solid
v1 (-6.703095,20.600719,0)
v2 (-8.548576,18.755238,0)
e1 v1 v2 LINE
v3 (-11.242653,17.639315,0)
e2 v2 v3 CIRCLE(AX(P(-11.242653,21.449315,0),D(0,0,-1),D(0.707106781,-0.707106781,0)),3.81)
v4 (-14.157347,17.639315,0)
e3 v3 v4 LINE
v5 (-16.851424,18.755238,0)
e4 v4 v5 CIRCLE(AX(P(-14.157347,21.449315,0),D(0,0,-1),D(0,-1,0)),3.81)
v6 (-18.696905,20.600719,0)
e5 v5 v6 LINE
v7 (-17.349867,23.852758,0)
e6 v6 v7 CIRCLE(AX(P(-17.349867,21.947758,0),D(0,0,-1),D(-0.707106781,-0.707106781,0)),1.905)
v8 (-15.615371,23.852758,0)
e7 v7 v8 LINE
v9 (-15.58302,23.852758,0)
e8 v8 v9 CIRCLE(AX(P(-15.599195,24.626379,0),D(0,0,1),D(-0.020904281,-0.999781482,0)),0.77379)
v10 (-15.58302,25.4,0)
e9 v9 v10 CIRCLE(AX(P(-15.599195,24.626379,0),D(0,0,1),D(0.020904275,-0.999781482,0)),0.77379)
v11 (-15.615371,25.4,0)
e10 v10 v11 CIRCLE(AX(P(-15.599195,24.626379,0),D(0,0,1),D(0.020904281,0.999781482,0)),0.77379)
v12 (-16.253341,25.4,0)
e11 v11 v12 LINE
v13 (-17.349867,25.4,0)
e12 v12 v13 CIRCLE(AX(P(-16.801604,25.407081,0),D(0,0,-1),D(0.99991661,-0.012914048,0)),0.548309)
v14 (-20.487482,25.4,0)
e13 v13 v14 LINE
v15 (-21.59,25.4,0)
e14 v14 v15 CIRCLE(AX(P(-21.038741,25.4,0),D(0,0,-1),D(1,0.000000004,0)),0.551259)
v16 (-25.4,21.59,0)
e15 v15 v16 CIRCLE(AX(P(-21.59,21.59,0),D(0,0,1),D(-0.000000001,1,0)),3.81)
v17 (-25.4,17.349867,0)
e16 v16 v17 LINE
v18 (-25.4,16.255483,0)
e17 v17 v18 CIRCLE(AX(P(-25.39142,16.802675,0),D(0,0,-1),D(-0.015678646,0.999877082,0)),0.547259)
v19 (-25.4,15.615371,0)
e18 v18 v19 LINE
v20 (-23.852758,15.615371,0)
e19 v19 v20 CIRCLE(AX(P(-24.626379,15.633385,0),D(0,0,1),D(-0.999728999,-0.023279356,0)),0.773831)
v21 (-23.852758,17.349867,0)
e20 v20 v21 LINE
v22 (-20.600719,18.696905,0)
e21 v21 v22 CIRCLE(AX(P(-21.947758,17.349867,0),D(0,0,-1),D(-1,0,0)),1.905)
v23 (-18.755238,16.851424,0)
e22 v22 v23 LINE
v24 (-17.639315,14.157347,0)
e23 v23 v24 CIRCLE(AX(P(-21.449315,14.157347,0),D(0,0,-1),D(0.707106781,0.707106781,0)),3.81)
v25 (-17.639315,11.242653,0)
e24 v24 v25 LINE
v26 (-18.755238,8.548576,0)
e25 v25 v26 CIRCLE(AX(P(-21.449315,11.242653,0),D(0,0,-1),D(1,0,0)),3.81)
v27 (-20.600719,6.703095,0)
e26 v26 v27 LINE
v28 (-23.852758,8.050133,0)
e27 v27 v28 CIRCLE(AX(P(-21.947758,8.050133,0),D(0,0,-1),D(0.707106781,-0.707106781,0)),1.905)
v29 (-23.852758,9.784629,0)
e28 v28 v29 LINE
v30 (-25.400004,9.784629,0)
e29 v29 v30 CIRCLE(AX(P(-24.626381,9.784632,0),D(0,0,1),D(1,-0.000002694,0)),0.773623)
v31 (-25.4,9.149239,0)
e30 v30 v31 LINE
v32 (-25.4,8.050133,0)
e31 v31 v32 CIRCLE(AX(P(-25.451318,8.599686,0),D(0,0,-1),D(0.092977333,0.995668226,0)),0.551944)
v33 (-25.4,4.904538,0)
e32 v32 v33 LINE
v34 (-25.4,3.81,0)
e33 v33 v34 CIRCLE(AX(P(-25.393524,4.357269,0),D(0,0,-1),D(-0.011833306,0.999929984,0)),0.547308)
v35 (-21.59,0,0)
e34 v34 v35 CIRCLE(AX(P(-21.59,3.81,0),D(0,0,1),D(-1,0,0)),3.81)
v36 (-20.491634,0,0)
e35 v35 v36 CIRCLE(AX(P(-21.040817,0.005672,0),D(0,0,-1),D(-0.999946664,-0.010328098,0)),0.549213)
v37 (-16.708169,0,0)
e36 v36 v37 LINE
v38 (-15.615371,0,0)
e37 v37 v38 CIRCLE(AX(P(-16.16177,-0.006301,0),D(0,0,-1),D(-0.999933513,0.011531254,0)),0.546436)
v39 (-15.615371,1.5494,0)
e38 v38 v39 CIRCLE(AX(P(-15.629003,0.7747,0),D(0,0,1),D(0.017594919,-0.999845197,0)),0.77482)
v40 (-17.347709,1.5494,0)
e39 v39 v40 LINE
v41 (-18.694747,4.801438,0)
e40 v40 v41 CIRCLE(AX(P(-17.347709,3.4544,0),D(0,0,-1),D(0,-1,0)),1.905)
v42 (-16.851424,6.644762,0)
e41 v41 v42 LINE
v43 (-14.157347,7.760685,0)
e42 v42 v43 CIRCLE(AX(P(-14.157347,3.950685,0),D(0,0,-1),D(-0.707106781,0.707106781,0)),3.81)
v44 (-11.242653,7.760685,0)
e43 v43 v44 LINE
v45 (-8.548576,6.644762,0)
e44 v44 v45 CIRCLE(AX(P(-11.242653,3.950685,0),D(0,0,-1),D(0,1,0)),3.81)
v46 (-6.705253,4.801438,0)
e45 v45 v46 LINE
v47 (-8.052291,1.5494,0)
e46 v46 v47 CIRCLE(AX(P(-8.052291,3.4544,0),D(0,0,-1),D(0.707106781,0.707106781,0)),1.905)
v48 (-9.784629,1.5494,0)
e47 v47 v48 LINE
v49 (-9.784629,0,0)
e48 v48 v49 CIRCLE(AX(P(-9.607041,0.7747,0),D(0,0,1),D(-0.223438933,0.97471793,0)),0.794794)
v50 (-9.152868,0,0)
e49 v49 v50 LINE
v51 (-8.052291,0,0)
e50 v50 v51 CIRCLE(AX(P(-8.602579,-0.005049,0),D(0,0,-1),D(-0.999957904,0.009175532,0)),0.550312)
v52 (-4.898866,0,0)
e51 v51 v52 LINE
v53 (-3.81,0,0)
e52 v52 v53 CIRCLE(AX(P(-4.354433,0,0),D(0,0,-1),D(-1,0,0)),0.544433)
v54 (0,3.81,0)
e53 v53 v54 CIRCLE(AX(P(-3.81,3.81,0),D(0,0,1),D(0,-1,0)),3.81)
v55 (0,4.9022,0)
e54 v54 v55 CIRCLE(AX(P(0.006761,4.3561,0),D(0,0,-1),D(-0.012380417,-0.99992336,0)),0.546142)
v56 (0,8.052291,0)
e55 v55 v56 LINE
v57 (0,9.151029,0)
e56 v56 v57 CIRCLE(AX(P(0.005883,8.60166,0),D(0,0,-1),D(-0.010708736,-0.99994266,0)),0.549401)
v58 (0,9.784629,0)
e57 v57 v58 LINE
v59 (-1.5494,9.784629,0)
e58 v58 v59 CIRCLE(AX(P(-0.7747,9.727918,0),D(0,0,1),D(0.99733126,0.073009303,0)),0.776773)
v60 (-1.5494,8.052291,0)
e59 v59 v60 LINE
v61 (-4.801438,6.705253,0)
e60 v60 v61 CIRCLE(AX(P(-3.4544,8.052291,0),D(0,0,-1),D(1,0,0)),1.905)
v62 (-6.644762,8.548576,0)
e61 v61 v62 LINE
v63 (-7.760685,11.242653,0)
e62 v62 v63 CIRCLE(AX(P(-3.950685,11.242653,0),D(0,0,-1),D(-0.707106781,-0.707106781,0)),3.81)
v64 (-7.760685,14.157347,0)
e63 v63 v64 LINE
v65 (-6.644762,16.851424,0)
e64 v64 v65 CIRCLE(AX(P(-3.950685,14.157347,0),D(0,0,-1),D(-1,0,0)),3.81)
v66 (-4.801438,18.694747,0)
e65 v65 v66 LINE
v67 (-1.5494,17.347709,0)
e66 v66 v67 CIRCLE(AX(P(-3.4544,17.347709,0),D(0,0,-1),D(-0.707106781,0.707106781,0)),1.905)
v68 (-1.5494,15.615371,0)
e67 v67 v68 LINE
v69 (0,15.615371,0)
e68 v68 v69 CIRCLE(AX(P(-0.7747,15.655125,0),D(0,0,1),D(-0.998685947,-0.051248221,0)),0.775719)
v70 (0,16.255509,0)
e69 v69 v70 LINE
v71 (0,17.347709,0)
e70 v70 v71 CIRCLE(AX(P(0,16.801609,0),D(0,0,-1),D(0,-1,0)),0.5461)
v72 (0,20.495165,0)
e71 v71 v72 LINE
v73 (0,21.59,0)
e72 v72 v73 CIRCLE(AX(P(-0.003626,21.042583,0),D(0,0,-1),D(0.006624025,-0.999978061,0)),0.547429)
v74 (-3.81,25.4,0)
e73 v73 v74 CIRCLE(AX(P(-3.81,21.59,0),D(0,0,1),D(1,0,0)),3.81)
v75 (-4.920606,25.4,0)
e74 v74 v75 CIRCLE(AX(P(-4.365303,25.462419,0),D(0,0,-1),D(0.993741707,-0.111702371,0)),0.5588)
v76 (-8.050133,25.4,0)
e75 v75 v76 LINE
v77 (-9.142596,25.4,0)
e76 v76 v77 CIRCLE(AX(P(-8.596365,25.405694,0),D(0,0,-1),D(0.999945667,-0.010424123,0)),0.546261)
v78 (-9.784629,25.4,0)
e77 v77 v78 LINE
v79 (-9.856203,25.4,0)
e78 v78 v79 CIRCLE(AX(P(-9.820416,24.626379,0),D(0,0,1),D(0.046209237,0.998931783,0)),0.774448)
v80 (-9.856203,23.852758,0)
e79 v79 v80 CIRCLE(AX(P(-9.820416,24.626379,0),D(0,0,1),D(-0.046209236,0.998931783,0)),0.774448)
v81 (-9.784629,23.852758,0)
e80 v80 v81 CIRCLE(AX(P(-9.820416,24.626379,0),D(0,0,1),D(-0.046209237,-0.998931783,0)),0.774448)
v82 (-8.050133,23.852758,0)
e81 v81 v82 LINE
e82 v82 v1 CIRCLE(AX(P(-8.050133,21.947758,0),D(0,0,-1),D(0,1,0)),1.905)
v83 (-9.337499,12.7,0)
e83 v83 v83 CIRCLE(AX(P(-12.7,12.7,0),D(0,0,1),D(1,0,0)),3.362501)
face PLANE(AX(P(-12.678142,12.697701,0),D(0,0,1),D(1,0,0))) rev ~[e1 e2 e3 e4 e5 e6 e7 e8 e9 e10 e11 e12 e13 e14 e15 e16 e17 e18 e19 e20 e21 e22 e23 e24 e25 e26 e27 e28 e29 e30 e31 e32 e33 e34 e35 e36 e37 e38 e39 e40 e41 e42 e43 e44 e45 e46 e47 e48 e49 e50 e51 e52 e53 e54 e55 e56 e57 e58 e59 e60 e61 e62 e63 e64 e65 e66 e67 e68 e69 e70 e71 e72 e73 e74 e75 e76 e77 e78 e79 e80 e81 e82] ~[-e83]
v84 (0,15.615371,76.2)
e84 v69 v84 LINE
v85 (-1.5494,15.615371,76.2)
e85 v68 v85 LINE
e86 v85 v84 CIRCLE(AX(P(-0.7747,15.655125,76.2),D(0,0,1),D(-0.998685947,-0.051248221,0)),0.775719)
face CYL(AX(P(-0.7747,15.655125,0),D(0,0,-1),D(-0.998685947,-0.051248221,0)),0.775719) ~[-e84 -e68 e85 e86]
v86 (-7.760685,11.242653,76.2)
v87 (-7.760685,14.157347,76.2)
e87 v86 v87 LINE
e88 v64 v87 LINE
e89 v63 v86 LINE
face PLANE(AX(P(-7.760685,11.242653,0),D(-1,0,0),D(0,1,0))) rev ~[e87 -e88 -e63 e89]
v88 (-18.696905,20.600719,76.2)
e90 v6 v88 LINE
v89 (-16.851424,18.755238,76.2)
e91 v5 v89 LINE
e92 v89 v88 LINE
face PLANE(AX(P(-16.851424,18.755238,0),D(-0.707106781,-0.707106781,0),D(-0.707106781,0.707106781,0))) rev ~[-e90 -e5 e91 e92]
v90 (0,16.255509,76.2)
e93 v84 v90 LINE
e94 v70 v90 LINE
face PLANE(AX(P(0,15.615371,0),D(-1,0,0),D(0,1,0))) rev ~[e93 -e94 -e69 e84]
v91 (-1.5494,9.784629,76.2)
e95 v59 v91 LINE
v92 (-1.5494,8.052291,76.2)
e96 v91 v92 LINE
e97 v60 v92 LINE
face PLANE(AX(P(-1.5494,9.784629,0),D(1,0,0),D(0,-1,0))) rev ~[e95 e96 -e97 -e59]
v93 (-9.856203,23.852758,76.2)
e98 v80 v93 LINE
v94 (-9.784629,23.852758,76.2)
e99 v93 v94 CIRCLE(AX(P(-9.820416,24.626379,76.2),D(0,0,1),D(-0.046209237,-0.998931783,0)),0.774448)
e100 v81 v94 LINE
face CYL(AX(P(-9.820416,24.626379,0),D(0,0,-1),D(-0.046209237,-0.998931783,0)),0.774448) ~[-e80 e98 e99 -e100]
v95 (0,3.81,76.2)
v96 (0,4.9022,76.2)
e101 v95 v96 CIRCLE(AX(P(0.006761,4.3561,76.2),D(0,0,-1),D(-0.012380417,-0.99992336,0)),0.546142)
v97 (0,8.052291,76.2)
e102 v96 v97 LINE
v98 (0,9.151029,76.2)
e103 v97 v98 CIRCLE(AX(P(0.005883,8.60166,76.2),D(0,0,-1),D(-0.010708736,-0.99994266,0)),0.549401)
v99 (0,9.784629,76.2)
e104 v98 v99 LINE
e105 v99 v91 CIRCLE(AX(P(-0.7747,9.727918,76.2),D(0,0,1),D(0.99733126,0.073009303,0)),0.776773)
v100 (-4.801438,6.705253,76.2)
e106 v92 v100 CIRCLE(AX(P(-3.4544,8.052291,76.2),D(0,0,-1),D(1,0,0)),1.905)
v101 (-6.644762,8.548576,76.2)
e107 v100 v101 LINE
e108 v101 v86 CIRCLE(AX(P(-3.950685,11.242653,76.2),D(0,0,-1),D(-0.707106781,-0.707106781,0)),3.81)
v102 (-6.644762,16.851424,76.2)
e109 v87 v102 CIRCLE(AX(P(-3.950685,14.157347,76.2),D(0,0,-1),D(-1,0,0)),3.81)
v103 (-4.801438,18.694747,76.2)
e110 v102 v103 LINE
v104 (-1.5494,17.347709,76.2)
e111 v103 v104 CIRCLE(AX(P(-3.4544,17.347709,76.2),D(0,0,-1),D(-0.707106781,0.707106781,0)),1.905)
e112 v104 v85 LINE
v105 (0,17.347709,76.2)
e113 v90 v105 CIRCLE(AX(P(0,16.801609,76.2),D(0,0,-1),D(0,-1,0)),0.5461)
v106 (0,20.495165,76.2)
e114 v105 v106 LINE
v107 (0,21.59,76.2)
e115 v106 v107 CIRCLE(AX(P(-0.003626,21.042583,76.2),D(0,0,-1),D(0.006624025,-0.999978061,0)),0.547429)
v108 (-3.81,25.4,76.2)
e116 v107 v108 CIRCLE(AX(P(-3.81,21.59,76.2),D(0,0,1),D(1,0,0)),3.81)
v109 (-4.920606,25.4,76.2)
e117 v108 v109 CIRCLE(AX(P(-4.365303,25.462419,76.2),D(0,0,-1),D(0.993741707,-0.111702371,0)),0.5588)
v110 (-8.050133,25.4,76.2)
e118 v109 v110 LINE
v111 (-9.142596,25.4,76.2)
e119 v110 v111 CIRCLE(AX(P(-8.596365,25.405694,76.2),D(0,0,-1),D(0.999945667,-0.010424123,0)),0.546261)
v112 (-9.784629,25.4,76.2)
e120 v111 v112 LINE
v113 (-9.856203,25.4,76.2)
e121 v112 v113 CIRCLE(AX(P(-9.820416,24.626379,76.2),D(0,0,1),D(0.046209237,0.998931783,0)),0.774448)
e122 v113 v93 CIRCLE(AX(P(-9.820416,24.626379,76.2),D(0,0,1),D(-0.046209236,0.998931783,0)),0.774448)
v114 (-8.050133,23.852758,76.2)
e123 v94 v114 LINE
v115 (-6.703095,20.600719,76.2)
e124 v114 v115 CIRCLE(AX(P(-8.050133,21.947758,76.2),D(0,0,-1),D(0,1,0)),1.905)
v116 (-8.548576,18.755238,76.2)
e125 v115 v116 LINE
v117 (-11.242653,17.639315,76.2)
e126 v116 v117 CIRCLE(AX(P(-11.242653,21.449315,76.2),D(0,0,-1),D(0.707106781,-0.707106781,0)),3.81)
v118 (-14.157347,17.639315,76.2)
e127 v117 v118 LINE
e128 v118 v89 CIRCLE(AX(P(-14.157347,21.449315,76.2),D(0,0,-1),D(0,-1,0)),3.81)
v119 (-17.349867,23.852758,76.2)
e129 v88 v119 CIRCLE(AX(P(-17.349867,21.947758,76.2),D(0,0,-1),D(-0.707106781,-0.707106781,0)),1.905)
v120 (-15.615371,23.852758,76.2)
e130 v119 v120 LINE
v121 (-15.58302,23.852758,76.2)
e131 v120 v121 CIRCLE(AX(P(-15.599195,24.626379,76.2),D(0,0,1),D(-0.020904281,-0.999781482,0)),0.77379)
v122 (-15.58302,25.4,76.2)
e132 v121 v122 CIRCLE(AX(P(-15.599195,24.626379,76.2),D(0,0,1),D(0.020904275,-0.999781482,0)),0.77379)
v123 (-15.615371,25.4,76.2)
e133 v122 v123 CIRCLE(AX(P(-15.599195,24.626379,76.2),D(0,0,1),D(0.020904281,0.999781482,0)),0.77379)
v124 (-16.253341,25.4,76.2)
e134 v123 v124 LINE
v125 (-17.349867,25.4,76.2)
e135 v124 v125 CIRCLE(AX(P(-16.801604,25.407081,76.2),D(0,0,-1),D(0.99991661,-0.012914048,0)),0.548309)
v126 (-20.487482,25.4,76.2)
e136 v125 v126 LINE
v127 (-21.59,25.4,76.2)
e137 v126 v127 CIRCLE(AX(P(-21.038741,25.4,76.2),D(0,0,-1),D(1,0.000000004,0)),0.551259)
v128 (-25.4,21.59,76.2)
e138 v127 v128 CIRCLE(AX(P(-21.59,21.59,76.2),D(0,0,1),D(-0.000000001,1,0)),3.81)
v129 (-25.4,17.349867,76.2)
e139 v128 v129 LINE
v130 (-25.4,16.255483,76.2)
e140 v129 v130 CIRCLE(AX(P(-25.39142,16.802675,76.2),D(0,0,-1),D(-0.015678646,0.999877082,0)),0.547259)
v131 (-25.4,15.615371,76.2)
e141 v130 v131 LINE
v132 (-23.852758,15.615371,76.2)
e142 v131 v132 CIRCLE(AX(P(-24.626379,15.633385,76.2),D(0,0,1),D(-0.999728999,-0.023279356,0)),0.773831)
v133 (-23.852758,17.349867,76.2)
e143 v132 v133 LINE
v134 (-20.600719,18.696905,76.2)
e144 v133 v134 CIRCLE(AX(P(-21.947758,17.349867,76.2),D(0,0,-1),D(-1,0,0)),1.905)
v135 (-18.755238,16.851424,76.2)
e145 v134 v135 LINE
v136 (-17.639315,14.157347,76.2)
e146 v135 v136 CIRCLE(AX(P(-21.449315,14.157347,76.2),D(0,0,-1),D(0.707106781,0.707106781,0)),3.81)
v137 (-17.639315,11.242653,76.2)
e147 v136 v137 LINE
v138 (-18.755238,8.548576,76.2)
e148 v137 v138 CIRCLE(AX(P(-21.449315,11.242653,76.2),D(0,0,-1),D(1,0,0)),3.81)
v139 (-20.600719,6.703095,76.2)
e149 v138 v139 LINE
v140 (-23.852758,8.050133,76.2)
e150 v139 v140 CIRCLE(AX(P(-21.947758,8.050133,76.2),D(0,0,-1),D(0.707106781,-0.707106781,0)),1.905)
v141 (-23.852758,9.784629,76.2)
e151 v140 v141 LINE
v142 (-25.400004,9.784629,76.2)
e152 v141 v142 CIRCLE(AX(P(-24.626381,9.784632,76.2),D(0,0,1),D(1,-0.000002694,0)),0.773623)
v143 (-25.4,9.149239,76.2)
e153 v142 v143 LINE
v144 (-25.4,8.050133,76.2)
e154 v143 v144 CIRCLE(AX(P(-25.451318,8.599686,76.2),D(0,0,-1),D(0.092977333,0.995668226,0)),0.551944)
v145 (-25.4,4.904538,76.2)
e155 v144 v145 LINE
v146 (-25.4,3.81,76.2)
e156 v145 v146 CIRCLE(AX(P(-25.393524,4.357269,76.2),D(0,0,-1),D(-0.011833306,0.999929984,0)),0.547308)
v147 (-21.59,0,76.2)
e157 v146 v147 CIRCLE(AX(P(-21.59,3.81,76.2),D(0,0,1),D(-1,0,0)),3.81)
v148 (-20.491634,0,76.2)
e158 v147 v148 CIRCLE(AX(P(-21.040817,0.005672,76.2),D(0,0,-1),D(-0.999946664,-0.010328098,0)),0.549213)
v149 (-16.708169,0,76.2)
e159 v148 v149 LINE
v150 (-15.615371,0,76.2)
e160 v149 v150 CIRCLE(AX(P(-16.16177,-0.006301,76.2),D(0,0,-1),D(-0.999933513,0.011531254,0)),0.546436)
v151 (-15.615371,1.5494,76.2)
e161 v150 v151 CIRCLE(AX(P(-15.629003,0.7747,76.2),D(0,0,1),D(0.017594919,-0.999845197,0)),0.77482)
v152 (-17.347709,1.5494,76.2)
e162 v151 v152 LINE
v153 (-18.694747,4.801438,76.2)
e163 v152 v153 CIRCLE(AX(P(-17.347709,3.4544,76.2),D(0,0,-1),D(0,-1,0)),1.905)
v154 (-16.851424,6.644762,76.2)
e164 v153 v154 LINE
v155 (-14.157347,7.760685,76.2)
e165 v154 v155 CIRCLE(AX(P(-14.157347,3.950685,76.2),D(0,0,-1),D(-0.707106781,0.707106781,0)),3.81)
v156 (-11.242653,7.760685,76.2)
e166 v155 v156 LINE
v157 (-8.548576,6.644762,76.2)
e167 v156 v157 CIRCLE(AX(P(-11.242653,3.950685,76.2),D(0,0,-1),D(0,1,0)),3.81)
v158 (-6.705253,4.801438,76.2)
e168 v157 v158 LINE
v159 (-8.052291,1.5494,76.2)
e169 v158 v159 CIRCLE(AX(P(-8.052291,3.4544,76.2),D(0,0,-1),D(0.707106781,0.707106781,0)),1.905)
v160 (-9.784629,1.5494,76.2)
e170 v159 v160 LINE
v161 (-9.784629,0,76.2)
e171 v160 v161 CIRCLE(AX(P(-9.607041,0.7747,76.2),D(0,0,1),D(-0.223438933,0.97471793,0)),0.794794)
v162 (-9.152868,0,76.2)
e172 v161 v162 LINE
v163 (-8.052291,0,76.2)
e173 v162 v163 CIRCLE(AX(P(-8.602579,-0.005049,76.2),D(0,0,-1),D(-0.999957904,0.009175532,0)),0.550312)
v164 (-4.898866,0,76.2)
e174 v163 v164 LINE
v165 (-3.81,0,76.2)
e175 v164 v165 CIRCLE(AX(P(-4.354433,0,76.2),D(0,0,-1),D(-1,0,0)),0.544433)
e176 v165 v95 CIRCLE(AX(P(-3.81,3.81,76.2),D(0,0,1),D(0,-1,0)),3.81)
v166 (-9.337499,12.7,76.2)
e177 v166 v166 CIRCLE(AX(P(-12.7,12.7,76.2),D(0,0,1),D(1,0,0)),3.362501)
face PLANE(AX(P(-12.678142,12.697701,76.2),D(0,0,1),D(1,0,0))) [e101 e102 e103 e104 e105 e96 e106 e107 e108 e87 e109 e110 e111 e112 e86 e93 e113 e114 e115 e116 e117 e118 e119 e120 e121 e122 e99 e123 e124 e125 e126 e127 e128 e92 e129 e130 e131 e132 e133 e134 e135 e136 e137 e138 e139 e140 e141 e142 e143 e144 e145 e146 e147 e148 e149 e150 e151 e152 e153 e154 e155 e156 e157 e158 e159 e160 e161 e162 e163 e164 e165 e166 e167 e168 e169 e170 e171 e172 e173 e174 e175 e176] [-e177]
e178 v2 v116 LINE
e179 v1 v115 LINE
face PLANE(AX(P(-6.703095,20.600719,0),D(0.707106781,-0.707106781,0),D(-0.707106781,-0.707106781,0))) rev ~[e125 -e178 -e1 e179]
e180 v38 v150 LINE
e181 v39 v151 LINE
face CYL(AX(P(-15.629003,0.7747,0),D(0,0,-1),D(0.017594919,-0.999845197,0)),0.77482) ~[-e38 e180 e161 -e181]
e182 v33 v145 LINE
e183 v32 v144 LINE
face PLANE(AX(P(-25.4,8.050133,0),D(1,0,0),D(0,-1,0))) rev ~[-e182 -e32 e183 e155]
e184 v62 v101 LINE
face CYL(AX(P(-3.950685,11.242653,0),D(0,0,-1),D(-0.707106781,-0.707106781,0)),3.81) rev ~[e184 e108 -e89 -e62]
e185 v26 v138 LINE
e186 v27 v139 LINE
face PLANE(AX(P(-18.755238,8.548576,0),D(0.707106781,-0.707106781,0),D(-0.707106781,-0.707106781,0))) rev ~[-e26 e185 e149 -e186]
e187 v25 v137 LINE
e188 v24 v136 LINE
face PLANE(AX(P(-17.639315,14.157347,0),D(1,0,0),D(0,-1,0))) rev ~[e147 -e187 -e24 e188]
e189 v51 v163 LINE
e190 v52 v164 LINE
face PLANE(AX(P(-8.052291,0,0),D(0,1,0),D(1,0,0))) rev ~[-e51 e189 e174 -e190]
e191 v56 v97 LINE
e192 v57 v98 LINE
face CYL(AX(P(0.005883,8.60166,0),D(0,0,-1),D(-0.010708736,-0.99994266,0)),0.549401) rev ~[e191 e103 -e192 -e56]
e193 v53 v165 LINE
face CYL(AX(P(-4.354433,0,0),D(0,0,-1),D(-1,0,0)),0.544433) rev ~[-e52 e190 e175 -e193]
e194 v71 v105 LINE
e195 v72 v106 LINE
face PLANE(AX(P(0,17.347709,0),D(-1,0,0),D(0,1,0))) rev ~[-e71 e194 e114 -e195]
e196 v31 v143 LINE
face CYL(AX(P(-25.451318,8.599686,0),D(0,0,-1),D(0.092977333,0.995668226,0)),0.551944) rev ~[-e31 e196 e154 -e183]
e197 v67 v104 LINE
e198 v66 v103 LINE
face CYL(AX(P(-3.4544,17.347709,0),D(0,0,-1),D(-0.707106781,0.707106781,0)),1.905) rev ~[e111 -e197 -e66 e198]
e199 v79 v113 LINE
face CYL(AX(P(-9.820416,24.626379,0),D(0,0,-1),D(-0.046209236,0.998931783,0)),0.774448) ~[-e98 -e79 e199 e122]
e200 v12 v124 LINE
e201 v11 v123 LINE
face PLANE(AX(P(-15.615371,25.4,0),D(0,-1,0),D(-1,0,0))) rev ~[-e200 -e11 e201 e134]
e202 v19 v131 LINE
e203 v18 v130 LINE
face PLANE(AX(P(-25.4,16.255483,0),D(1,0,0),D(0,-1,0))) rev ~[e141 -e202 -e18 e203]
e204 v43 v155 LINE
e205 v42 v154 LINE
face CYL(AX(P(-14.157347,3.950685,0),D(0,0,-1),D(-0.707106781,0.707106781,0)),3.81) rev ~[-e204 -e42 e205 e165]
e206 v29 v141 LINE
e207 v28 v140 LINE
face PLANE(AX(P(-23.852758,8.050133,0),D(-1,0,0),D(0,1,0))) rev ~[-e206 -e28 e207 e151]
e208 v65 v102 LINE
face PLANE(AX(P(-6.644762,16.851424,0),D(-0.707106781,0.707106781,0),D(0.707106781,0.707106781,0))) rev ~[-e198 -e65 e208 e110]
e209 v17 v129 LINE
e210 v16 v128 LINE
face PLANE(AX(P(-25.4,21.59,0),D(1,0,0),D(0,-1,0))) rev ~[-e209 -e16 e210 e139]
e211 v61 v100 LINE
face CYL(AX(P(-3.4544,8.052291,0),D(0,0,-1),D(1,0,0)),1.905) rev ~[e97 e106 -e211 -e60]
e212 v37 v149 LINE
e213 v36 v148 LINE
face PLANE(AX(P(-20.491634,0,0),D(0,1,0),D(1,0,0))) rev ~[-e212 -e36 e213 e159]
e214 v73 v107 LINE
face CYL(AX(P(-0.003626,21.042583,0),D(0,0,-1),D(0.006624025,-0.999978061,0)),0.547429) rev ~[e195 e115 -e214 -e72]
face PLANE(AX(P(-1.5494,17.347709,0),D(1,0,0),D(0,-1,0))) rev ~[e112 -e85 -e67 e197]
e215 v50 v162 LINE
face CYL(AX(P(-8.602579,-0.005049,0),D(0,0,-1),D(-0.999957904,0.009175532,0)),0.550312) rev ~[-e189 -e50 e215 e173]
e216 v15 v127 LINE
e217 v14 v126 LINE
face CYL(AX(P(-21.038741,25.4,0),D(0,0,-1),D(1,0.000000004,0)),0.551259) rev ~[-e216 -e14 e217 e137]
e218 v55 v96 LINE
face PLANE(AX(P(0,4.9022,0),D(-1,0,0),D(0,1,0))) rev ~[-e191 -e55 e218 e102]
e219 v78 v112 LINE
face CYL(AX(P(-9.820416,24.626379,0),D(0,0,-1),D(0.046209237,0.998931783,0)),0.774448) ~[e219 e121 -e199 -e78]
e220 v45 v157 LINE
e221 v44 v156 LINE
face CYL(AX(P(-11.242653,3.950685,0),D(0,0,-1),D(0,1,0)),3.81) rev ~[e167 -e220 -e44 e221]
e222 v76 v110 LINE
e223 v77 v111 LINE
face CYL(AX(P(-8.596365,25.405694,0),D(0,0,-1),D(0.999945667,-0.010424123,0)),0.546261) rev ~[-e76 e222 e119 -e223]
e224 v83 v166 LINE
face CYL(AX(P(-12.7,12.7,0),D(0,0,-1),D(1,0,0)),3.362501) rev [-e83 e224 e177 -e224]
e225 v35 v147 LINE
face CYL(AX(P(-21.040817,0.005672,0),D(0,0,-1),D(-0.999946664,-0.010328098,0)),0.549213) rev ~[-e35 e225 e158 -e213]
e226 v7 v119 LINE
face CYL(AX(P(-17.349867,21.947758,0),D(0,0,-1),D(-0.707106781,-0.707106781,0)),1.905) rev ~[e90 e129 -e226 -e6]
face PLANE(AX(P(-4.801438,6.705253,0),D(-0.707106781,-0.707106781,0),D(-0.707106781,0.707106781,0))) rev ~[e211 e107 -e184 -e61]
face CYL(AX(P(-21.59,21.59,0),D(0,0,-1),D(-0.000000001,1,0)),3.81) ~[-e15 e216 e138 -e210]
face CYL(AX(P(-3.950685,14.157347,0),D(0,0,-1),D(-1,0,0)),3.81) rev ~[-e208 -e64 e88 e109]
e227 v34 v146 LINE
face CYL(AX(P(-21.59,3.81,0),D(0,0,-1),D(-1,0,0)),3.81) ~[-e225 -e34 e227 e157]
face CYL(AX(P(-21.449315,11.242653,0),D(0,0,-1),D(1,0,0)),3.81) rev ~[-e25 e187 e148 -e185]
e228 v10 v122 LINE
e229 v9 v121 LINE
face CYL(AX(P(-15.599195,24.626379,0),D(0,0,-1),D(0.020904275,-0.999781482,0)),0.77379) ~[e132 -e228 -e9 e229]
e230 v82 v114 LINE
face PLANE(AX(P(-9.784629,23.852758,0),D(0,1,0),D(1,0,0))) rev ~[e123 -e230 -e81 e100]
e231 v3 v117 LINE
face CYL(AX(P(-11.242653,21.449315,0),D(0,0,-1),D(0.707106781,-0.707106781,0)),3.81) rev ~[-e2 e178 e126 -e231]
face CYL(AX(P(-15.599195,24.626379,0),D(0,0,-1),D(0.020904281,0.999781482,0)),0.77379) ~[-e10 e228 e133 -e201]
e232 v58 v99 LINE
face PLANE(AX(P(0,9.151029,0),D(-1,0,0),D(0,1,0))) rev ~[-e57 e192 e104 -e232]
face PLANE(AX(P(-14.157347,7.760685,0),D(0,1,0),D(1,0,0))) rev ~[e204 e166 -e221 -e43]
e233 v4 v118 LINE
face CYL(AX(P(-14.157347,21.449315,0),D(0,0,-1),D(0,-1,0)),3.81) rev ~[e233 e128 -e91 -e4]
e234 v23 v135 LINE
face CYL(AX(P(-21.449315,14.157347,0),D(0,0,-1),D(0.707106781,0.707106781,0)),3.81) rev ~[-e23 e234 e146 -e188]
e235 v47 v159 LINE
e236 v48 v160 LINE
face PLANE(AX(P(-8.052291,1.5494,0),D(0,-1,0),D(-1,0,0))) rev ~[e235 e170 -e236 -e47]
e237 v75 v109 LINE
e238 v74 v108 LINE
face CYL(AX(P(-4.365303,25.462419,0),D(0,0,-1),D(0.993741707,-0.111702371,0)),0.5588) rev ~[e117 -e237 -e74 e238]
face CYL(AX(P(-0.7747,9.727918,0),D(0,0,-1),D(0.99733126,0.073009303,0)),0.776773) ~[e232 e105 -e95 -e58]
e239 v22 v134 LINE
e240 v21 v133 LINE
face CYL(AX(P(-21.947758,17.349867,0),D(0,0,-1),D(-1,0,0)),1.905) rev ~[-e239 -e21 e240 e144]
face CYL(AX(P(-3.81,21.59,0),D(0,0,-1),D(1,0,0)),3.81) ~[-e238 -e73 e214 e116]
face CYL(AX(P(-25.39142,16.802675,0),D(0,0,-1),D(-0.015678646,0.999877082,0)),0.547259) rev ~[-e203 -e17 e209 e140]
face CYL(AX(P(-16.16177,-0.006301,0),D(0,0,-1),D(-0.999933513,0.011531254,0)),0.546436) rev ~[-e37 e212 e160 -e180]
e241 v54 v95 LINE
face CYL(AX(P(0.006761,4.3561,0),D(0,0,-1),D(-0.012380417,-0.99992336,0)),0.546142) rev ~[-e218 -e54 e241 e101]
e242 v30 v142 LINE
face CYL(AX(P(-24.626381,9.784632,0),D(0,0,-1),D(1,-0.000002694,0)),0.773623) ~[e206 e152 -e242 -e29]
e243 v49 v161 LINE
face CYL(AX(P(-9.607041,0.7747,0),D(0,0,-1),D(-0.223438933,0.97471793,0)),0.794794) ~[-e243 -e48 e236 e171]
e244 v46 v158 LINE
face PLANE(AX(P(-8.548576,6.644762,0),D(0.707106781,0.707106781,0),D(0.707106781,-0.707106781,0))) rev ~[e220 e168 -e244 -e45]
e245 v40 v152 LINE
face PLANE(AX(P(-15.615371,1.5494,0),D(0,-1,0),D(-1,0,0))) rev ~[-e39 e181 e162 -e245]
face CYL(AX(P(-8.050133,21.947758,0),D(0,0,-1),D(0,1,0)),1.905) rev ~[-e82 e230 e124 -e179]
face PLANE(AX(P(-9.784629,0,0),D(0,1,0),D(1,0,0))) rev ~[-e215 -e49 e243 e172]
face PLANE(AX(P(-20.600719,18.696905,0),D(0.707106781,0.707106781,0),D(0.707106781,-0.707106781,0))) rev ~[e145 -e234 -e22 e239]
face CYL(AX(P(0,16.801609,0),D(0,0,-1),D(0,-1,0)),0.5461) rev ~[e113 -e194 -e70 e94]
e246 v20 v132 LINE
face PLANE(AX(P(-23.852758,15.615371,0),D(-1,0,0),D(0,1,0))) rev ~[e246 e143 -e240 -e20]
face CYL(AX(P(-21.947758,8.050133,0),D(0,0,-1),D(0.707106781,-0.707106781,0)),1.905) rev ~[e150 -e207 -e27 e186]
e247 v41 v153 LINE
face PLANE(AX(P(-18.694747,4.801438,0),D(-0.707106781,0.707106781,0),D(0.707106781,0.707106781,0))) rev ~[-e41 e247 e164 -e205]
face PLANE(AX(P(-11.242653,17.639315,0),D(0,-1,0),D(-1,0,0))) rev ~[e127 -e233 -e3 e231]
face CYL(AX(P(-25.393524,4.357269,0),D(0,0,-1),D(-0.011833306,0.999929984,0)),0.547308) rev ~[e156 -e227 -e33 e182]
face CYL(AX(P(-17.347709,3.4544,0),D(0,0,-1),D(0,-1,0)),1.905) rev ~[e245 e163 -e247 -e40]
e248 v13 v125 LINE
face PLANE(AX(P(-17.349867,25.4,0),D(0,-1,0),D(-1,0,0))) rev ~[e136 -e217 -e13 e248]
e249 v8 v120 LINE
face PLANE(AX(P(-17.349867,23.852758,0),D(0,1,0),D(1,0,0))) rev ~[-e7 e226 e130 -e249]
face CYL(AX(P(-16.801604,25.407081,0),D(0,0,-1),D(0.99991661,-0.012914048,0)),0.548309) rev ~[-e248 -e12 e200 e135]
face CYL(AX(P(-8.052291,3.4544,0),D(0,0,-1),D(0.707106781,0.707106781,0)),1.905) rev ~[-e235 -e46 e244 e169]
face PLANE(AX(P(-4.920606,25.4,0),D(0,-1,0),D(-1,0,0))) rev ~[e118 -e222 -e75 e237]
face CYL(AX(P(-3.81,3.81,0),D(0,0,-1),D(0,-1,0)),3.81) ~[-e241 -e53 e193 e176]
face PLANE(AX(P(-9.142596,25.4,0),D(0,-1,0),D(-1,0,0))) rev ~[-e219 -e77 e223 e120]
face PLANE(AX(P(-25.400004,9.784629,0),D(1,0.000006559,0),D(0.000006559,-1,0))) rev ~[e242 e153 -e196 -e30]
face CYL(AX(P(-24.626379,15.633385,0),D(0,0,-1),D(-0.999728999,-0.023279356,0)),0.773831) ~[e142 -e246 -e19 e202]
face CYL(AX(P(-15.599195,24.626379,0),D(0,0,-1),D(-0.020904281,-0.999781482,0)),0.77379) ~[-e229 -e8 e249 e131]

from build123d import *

# Parameters (mm, degrees)
F0_R     = 3.3625011168
F1_DEPTH = 76.2


# Not quite as in the source:
# - ends of sketch curves that miss each other by under 0.0002 mm in the source are joined


with BuildPart() as f1:
    # F0 (on Top) → F1 (new body)
    with BuildSketch(Plane.XY):
        with BuildLine():
            ThreePointArc((-8.5485764575, 18.7552378401), (-9.7846294165, 17.9293336576), (-11.2426532939, 17.6393146764))
            Line((-11.2426532939, 17.6393146764), (-14.1573467061, 17.6393146764))
            ThreePointArc((-14.1573467061, 17.6393146764), (-15.6153705835, 17.9293336576), (-16.8514235425, 18.7552378401))
            Line((-16.8514235425, 18.7552378401), (-18.696905198, 20.6007194956))
            ThreePointArc((-18.696905198, 20.6007194956), (-19.1098572893, 22.6767698525), (-17.3498667798, 23.8527579138))
            Line((-17.3498667798, 23.8527579138), (-15.6153705835, 23.8527579138))
            Line((-15.6153705835, 23.8527579138), (-15.5830195394, 23.8527579138))
            ThreePointArc((-15.5830195394, 23.8527579138), (-14.8254049311, 24.6263789569), (-15.5830195394, 25.4))
            Line((-15.5830195394, 25.4), (-15.6153705835, 25.4))
            Line((-15.6153705835, 25.4), (-16.2533409894, 25.4))
            ThreePointArc((-16.2533409894, 25.4), (-16.8016038846, 24.8587722652), (-17.3498667798, 25.4))
            Line((-17.3498667798, 25.4), (-20.4874817282, 25.4))
            ThreePointArc((-20.4874817282, 25.4), (-21.0387408641, 24.8487408595), (-21.5900000046, 25.4))
            ThreePointArc((-21.5900000046, 25.4), (-24.2840768363, 24.2840768363), (-25.4, 21.59))
            Line((-25.4, 21.59), (-25.4, 20.5047242343))
            Line((-25.4, 20.5047242343), (-25.4, 17.3498667798))
            ThreePointArc((-25.4, 17.3498667798), (-24.8441605755, 16.8026749055), (-25.4, 16.2554830313))
            Line((-25.4, 16.2554830313), (-25.4, 15.6153705835))
            ThreePointArc((-25.4, 15.6153705835), (-24.6263789569, 14.8595541131), (-23.8527579138, 15.6153705835))
            Line((-23.8527579138, 15.6153705835), (-23.8527579138, 17.3498667798))
            ThreePointArc((-23.8527579138, 17.3498667798), (-22.6767698525, 19.1098572893), (-20.6007194956, 18.696905198))
            Line((-20.6007194956, 18.696905198), (-18.7552378401, 16.8514235425))
            ThreePointArc((-18.7552378401, 16.8514235425), (-17.9293336576, 15.6153705835), (-17.6393146764, 14.1573467061))
            Line((-17.6393146764, 14.1573467061), (-17.6393146764, 11.2426532939))
            ThreePointArc((-17.6393146764, 11.2426532939), (-17.9293336576, 9.7846294165), (-18.7552378401, 8.5485764575))
            Line((-18.7552378401, 8.5485764575), (-20.6007194956, 6.703094802))
            ThreePointArc((-20.6007194956, 6.703094802), (-22.6767698525, 6.2901427107), (-23.8527579138, 8.0501332202))
            Line((-23.8527579138, 8.0501332202), (-23.8527579138, 9.7846294165))
            ThreePointArc((-23.8527579138, 9.7846294165), (-24.6263789569, 10.5582546272), (-25.4000041675, 9.7846294165))
            Line((-25.4000041675, 9.7846294165), (-25.4, 9.1492393985))
            ThreePointArc((-25.4, 9.1492393985), (-24.8993742936, 8.5996863094), (-25.4, 8.0501332202))
            Line((-25.4, 8.0501332202), (-25.4, 4.904538393))
            ThreePointArc((-25.4, 4.904538393), (-24.8462160257, 4.3572691965), (-25.4, 3.81))
            ThreePointArc((-25.4, 3.81), (-24.2840768363, 1.1159231637), (-21.59, 0))
            ThreePointArc((-21.59, 0), (-21.0408167821, 0.5548848314), (-20.4916335642, 0))
            Line((-20.4916335642, 0), (-16.7081691325, 0))
            ThreePointArc((-16.7081691325, 0), (-16.161769858, 0.5401345174), (-15.6153705835, 0))
            ThreePointArc((-15.6153705835, 0), (-14.8541835334, 0.7747), (-15.6153705835, 1.5494))
            Line((-15.6153705835, 1.5494), (-17.347708866, 1.5494))
            ThreePointArc((-17.347708866, 1.5494), (-19.1076993754, 2.7253880613), (-18.6947472842, 4.8014384182))
            Line((-18.6947472842, 4.8014384182), (-16.8514235425, 6.6447621599))
            ThreePointArc((-16.8514235425, 6.6447621599), (-15.6153705835, 7.4706663424), (-14.1573467061, 7.7606853236))
            Line((-14.1573467061, 7.7606853236), (-11.2426532939, 7.7606853236))
            ThreePointArc((-11.2426532939, 7.7606853236), (-9.7846294165, 7.4706663424), (-8.5485764575, 6.6447621599))
            Line((-8.5485764575, 6.6447621599), (-6.7052527158, 4.8014384182))
            ThreePointArc((-6.7052527158, 4.8014384182), (-6.2923006246, 2.7253880613), (-8.052291134, 1.5494))
            Line((-8.052291134, 1.5494), (-9.7846294165, 1.5494))
            ThreePointArc((-9.7846294165, 1.5494), (-10.4018355229, 0.7747), (-9.7846294165, 0))
            Line((-9.7846294165, 0), (-9.1528678313, 0))
            ThreePointArc((-9.1528678313, 0), (-8.6025794826, 0.5452621138), (-8.052291134, 0))
            Line((-8.052291134, 0), (-4.8988661729, 0))
            ThreePointArc((-4.8988661729, 0), (-4.3544330864, 0.5444330864), (-3.81, 0))
            ThreePointArc((-3.81, 0), (-1.1159231637, 1.1159231637), (0, 3.81))
            ThreePointArc((0, 3.81), (-0.5393803924, 4.3561), (0, 4.9022))
            Line((0, 4.9022), (0, 8.052291134))
            ThreePointArc((0, 8.052291134), (-0.5435172497, 8.6016602673), (0, 9.1510294005))
            Line((0, 9.1510294005), (0, 9.7846294165))
            ThreePointArc((0, 9.7846294165), (-0.7747, 10.5046907664), (-1.5494, 9.7846294165))
            Line((-1.5494, 9.7846294165), (-1.5494, 8.052291134))
            ThreePointArc((-1.5494, 8.052291134), (-2.7253880613, 6.2923006246), (-4.8014384182, 6.7052527158))
            Line((-4.8014384182, 6.7052527158), (-6.6447621599, 8.5485764575))
            ThreePointArc((-6.6447621599, 8.5485764575), (-7.4706663424, 9.7846294165), (-7.7606853236, 11.2426532939))
            Line((-7.7606853236, 11.2426532939), (-7.7606853236, 14.1573467061))
            ThreePointArc((-7.7606853236, 14.1573467061), (-7.4706663424, 15.6153705835), (-6.6447621599, 16.8514235425))
            Line((-6.6447621599, 16.8514235425), (-4.8014384182, 18.6947472842))
            ThreePointArc((-4.8014384182, 18.6947472842), (-2.7253880613, 19.1076993754), (-1.5494, 17.347708866))
            Line((-1.5494, 17.347708866), (-1.5494, 15.6153705835))
            ThreePointArc((-1.5494, 15.6153705835), (-0.7747, 14.8794054827), (0, 15.6153705835))
            Line((0, 15.6153705835), (0, 16.255508866))
            ThreePointArc((0, 16.255508866), (-0.5461, 16.801608866), (0, 17.347708866))
            Line((0, 17.347708866), (0, 20.4951651394))
            ThreePointArc((0, 20.4951651394), (-0.5510556267, 21.0425825697), (0, 21.59))
            ThreePointArc((0, 21.59), (-1.1159231637, 24.2840768363), (-3.81, 25.4))
            ThreePointArc((-3.81, 25.4), (-4.3653028659, 24.9036192847), (-4.9206057318, 25.4))
            Line((-4.9206057318, 25.4), (-8.0501332202, 25.4))
            ThreePointArc((-8.0501332202, 25.4), (-8.5963647474, 24.8594330871), (-9.1425962746, 25.4))
            Line((-9.1425962746, 25.4), (-9.7846294165, 25.4))
            Line((-9.7846294165, 25.4), (-9.856202747, 25.4))
            ThreePointArc((-9.856202747, 25.4), (-10.594864404, 24.6263789569), (-9.856202747, 23.8527579138))
            Line((-9.856202747, 23.8527579138), (-9.7846294165, 23.8527579138))
            Line((-9.7846294165, 23.8527579138), (-8.0501332202, 23.8527579138))
            ThreePointArc((-8.0501332202, 23.8527579138), (-6.2901427107, 22.6767698525), (-6.703094802, 20.6007194956))
            Line((-6.703094802, 20.6007194956), (-8.5485764575, 18.7552378401))
        make_face()
        with Locations((-12.7, 12.7)):
            Circle(F0_R, mode=Mode.SUBTRACT)
        with BuildLine():
            ThreePointArc((-9.856202747, 23.8527579138), (-9.8204160818, 23.8519306347), (-9.7846294165, 23.8527579138))
            Line((-9.7846294165, 23.8527579138), (-9.856202747, 23.8527579138))
        make_face()
        with BuildLine():
            Line((-15.5830195394, 23.8527579138), (-15.6153705835, 23.8527579138))
            ThreePointArc((-15.6153705835, 23.8527579138), (-15.5991950614, 23.8525888265), (-15.5830195394, 23.8527579138))
        make_face()
        with BuildLine():
            ThreePointArc((-9.7846294165, 25.4), (-9.8204160818, 25.4008272791), (-9.856202747, 25.4))
            Line((-9.856202747, 25.4), (-9.7846294165, 25.4))
        make_face()
        with BuildLine():
            Line((-15.6153705835, 25.4), (-15.5830195394, 25.4))
            ThreePointArc((-15.5830195394, 25.4), (-15.5991950614, 25.4001690873), (-15.6153705835, 25.4))
        make_face()
    extrude(amount=F1_DEPTH)


solid = f1.part
